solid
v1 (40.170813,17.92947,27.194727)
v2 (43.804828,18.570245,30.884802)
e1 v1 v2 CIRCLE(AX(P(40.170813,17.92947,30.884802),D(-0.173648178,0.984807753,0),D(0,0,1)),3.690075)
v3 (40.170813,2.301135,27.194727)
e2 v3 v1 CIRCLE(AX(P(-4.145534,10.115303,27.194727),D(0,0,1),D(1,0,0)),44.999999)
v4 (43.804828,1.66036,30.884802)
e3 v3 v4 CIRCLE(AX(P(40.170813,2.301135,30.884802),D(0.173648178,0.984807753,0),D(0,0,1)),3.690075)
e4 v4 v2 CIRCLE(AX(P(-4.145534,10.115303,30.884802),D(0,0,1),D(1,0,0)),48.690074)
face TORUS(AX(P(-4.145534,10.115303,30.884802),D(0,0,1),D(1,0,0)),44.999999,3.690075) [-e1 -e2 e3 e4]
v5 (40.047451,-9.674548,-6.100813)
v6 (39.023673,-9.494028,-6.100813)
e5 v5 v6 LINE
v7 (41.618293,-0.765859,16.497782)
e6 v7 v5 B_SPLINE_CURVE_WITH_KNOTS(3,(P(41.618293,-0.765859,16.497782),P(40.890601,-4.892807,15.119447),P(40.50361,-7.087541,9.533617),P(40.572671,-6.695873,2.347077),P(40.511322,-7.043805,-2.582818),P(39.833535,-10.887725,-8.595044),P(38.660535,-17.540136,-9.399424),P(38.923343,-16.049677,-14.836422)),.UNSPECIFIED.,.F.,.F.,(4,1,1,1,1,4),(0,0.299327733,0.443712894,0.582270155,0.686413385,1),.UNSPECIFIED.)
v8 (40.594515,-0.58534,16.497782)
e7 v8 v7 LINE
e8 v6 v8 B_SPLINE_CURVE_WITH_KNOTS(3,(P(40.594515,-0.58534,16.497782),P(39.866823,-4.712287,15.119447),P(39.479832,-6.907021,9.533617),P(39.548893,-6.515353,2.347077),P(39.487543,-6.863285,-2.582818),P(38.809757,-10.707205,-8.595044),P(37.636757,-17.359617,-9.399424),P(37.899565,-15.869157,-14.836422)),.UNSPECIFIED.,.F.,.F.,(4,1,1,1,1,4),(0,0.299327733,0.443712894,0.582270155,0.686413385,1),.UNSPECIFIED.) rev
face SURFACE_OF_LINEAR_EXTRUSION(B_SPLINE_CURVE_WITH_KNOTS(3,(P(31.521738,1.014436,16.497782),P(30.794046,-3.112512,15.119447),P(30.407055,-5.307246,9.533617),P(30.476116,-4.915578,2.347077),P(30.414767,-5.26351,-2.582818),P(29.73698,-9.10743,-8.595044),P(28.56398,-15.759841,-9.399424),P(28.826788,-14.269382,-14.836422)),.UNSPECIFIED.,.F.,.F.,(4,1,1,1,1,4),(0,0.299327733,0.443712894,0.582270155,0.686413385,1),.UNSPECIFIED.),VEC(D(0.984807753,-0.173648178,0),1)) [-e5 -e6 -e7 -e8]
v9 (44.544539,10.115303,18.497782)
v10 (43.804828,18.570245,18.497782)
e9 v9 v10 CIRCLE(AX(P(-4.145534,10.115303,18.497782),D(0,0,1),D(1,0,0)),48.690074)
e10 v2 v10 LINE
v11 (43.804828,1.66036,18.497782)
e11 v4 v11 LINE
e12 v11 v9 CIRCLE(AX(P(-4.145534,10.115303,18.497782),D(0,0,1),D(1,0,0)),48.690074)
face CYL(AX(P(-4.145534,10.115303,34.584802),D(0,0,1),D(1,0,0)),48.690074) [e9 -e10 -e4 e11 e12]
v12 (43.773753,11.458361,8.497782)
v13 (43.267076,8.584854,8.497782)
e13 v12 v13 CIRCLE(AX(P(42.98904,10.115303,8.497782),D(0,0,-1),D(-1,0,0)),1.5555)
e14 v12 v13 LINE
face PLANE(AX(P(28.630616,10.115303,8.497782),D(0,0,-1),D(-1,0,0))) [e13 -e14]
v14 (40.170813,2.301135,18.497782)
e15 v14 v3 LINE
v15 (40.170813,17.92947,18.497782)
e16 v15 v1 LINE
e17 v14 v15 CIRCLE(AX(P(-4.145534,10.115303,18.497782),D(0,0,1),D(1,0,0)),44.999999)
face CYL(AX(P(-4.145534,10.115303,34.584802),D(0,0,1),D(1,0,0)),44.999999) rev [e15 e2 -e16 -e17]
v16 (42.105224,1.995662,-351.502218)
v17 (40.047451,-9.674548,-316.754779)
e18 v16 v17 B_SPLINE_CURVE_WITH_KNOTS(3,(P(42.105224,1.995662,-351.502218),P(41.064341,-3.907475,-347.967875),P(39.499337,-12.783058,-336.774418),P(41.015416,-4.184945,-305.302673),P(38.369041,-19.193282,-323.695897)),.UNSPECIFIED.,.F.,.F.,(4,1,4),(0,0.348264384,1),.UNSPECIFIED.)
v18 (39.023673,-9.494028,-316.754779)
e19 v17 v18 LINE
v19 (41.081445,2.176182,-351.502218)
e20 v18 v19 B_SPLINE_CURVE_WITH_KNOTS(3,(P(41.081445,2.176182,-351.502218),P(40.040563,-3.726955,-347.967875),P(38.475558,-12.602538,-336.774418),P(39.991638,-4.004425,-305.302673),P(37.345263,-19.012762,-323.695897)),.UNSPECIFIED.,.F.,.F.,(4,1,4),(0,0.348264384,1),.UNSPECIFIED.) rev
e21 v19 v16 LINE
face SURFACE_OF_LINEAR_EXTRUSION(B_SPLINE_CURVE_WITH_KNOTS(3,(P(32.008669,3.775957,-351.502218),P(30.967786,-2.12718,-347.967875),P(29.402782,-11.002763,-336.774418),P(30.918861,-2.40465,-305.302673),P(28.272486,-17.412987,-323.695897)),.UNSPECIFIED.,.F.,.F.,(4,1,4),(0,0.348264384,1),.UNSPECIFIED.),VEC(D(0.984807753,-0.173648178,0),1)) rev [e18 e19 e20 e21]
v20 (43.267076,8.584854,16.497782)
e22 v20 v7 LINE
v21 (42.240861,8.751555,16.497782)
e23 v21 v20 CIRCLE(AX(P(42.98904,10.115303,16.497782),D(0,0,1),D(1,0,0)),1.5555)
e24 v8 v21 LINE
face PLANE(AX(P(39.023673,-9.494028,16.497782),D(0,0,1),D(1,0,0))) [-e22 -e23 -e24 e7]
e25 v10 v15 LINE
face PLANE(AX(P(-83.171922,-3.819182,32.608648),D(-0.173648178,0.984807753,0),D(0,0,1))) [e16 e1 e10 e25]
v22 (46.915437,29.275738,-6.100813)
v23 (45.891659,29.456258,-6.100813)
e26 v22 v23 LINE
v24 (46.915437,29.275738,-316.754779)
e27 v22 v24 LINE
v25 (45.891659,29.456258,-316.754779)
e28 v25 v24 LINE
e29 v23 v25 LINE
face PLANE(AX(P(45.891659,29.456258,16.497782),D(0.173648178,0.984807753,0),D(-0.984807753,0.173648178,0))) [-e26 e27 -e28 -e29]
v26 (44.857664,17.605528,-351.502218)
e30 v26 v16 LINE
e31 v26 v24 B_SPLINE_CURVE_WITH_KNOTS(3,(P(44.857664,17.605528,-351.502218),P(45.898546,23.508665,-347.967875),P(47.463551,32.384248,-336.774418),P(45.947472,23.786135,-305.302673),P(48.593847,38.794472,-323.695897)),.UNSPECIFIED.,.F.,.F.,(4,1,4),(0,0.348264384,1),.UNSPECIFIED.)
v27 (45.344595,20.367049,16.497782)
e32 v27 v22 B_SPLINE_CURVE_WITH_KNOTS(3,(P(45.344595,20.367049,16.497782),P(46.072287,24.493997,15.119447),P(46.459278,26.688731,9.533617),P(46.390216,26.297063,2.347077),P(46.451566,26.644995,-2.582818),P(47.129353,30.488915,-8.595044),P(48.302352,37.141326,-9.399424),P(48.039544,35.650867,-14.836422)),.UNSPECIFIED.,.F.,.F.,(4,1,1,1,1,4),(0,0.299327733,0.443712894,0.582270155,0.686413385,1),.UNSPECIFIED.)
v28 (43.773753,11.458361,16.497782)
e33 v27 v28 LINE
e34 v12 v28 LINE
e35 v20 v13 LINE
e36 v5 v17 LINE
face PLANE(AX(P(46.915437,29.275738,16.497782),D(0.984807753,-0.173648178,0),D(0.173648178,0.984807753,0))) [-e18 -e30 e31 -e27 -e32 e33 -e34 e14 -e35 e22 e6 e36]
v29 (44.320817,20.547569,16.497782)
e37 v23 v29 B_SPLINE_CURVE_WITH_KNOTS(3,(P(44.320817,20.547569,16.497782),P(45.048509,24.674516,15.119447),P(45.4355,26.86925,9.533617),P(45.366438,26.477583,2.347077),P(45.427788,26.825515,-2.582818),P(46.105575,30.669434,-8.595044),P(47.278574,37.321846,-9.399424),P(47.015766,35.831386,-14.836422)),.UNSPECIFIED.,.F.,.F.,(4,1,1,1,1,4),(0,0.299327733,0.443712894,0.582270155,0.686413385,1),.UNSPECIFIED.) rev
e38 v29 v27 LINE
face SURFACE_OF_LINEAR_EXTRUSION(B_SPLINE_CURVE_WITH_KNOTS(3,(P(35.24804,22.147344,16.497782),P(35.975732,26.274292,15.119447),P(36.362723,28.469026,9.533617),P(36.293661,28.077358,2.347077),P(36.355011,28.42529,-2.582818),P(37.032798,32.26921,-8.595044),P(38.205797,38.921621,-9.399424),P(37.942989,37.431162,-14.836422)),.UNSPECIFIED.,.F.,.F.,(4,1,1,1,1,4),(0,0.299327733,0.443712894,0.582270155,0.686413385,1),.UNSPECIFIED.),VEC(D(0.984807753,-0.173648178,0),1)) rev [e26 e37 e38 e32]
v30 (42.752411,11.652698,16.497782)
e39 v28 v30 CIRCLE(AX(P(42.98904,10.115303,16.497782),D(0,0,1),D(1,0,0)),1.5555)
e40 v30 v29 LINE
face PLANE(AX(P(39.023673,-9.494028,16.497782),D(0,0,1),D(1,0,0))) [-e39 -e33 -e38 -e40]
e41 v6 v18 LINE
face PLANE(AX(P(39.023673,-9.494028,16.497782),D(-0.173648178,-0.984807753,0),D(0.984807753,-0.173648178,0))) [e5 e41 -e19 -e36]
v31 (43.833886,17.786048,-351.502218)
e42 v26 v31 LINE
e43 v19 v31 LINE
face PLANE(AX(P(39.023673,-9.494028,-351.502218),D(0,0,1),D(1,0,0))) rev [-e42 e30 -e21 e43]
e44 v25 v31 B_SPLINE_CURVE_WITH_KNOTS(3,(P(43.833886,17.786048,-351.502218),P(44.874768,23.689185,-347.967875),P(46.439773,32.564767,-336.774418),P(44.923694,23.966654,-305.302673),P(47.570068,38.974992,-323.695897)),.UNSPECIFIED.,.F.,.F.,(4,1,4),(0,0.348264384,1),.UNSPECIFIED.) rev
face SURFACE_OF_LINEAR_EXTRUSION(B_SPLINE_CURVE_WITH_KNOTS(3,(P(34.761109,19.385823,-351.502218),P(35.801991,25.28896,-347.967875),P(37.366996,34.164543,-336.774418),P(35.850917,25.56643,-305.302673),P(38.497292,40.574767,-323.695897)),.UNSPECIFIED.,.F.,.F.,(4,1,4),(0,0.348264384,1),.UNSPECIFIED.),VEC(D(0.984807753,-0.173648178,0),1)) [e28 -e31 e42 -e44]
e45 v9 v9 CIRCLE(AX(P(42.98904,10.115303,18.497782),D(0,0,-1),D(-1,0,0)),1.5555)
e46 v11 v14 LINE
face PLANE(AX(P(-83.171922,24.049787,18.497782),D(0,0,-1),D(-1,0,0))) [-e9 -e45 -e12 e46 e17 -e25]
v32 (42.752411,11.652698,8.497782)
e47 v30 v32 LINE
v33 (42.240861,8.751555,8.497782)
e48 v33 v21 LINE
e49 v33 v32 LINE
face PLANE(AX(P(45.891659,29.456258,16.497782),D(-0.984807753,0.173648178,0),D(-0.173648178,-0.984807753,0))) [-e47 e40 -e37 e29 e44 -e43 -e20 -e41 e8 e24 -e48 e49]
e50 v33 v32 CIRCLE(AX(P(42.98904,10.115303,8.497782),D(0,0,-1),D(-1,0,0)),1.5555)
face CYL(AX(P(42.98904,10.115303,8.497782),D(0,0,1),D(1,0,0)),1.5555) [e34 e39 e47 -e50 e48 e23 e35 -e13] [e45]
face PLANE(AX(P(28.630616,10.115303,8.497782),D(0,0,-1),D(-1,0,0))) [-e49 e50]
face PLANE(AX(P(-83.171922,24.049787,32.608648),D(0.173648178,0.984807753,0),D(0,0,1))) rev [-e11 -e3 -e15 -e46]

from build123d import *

# Parameters (mm, degrees)
REVOLVE_1_ANGLE          = 20
EXTRUDE_1_DEPTH          = 10
EXTRUDE_2_DEPTH          = 360
EXTRUDE_2_DEPTH_BACK     = 8
CUT_EXTRUDE_1_DEPTH      = 354.460525949
CUT_EXTRUDE_1_DEPTH_BACK = 354.460525949
CUT_EXTRUDE_2_DEPTH      = 354.460526061
CUT_EXTRUDE_2_DEPTH_BACK = 354.460526061


# Read off the part's stored shape, not the designer's step: 旋转1
with BuildPart() as part:
    # 旋转1 outline → 旋转1 (revolve)
    with BuildSketch(Plane(origin=(-4.145534285, 10.115302746, 0), x_dir=(0.9848077530122078, -0.17364817766693175, 0), z_dir=(-0.17364817766693175, -0.9848077530122078, 0))):
        with BuildLine():
            Line((48.69007377, 18.497782452), (48.69007377, 30.884801913))
            ThreePointArc((48.69007377, 30.884801913), (42.390721279, 33.49407915), (44.999998514, 27.194726658))
            Line((44.999998514, 27.194726658), (44.999998514, 18.497782452))
            Line((44.999998514, 18.497782452), (48.69007377, 18.497782452))
        make_face()
    revolve(axis=Axis((-4.145534285, 10.115302746, 0), (0, 0, 1)), revolution_arc=REVOLVE_1_ANGLE)

    # 草图2 → 凸台-拉伸1 (add)
    with BuildSketch(Plane(origin=(0, 0, 18.497782452), x_dir=(-1, 0, 0), z_dir=(0, 0, -1))):
        with BuildLine():
            Line((-43.804827858, 10.115302746), (-43.804827858, 8.790890094))
            ThreePointArc((-43.804827858, 8.790890094), (-42.230547682, 8.757264374), (-41.433540442, 10.115302746))
            Line((-41.433540442, 10.115302746), (-43.804827858, 10.115302746))
        make_face()
        with BuildLine():
            Line((-43.804827858, 11.439715397), (-43.804827858, 10.115302746))
            Line((-43.804827858, 10.115302746), (-41.433540442, 10.115302746))
            ThreePointArc((-41.433540442, 10.115302746), (-42.230547682, 11.473341118), (-43.804827858, 11.439715397))
        make_face()
        with BuildLine():
            ThreePointArc((-43.804827858, 11.439715397), (-44.544539485, 10.115302746), (-43.804827858, 8.790890094))
            Line((-43.804827858, 8.790890094), (-43.804827858, 10.115302746))
            Line((-43.804827858, 10.115302746), (-43.804827858, 11.439715397))
        make_face()
    extrude(amount=EXTRUDE_1_DEPTH)

    # 草图3 → 凸台-拉伸2 (add, two sides: drawn at the far end of the back side and taken through both)
    with BuildSketch(Plane(origin=(0, 0, 8.497782452), x_dir=(-1, 0, 0), z_dir=(0, 0, -1)).offset(-EXTRUDE_2_DEPTH_BACK)):
        Polygon((-45.891658823, 29.456257554), (-46.915436985, 29.275737842), (-40.047450695, -9.674547938), (-39.023672534, -9.494028226), align=None)
    extrude(amount=EXTRUDE_2_DEPTH + EXTRUDE_2_DEPTH_BACK)

    # 草图4 → 切除-拉伸1 (cut, two sides: drawn at the far end of the back side and taken through both)
    with BuildSketch(Plane(origin=(40.494317434, -7.140240729, 0), x_dir=(0, 0, -1), z_dir=(0.9848077530122087, -0.17364817766692764, 0)).offset(-CUT_EXTRUDE_1_DEPTH_BACK)):
        with BuildLine():
            Line((-16.497782452, 36.977753739), (-16.497782452, 27.931634297))
            add(Edge.make_bspline(
                [(-16.497782452, 27.931634297), (-15.119446691, 32.122246332), (-9.533617097, 34.35083792), (-2.34707738, 33.953128128), (2.582817502, 34.306427345), (5.20587008, 36.009348447), (6.100812574, 36.977753739)],
                knots=[0, 0, 0, 0, 0.299327733, 0.443712894, 0.582270155, 0.686413385, 0.686413385, 0.686413385, 0.686413385], degree=3))
            Line((6.100812574, 36.977753739), (-16.497782452, 36.977753739))
        make_face()
        with BuildLine():
            Line((-16.497782452, 6.472716459), (-16.497782452, -2.573402982))
            Line((-16.497782452, -2.573402982), (6.100812574, -2.573402982))
            add(Edge.make_bspline(
                [(-16.497782452, 6.472716459), (-15.119446691, 2.282104425), (-9.533617097, 0.053512837), (-2.34707738, 0.451222629), (2.582817502, 0.097923412), (5.20587008, -1.604997691), (6.100812574, -2.573402982)],
                knots=[0, 0, 0, 0, 0.299327733, 0.443712894, 0.582270155, 0.686413385, 0.686413385, 0.686413385, 0.686413385], degree=3))
        make_face()
    extrude(amount=CUT_EXTRUDE_1_DEPTH + CUT_EXTRUDE_1_DEPTH_BACK, mode=Mode.SUBTRACT)

    # 草图5 → 切除-拉伸2 (cut, two sides: drawn at the far end of the back side and taken through both)
    with BuildSketch(Plane(origin=(40.494317434, -7.140240729, 0), x_dir=(0, 0, -1), z_dir=(0.9848077530122087, -0.17364817766692764, 0)).offset(-CUT_EXTRUDE_2_DEPTH_BACK)):
        with BuildLine():
            Line((351.502217548, 36.977753739), (316.754779292, 36.977753739))
            add(Edge.make_bspline(
                [(351.502217548, 25.127512161), (347.967875432, 31.121714431), (339.410781642, 38.011527911), (319.00267796, 34.531851346), (316.754779292, 36.977753739)],
                knots=[0, 0, 0, 0, 0.348264384, 0.764472807, 0.764472807, 0.764472807, 0.764472807], degree=3))
            Line((351.502217548, 25.127512161), (351.502217548, 36.977753739))
        make_face()
        with BuildLine():
            Line((351.502217548, -2.573402982), (351.502217548, 9.276838596))
            add(Edge.make_bspline(
                [(351.502217548, 9.276838596), (347.967875432, 3.282636325), (339.410781642, -3.607177155), (319.00267796, -0.127500589), (316.754779292, -2.573402982)],
                knots=[0, 0, 0, 0, 0.348264384, 0.764472807, 0.764472807, 0.764472807, 0.764472807], degree=3))
            Line((316.754779292, -2.573402982), (351.502217548, -2.573402982))
        make_face()
    extrude(amount=CUT_EXTRUDE_2_DEPTH + CUT_EXTRUDE_2_DEPTH_BACK, mode=Mode.SUBTRACT)


solid = part.part
